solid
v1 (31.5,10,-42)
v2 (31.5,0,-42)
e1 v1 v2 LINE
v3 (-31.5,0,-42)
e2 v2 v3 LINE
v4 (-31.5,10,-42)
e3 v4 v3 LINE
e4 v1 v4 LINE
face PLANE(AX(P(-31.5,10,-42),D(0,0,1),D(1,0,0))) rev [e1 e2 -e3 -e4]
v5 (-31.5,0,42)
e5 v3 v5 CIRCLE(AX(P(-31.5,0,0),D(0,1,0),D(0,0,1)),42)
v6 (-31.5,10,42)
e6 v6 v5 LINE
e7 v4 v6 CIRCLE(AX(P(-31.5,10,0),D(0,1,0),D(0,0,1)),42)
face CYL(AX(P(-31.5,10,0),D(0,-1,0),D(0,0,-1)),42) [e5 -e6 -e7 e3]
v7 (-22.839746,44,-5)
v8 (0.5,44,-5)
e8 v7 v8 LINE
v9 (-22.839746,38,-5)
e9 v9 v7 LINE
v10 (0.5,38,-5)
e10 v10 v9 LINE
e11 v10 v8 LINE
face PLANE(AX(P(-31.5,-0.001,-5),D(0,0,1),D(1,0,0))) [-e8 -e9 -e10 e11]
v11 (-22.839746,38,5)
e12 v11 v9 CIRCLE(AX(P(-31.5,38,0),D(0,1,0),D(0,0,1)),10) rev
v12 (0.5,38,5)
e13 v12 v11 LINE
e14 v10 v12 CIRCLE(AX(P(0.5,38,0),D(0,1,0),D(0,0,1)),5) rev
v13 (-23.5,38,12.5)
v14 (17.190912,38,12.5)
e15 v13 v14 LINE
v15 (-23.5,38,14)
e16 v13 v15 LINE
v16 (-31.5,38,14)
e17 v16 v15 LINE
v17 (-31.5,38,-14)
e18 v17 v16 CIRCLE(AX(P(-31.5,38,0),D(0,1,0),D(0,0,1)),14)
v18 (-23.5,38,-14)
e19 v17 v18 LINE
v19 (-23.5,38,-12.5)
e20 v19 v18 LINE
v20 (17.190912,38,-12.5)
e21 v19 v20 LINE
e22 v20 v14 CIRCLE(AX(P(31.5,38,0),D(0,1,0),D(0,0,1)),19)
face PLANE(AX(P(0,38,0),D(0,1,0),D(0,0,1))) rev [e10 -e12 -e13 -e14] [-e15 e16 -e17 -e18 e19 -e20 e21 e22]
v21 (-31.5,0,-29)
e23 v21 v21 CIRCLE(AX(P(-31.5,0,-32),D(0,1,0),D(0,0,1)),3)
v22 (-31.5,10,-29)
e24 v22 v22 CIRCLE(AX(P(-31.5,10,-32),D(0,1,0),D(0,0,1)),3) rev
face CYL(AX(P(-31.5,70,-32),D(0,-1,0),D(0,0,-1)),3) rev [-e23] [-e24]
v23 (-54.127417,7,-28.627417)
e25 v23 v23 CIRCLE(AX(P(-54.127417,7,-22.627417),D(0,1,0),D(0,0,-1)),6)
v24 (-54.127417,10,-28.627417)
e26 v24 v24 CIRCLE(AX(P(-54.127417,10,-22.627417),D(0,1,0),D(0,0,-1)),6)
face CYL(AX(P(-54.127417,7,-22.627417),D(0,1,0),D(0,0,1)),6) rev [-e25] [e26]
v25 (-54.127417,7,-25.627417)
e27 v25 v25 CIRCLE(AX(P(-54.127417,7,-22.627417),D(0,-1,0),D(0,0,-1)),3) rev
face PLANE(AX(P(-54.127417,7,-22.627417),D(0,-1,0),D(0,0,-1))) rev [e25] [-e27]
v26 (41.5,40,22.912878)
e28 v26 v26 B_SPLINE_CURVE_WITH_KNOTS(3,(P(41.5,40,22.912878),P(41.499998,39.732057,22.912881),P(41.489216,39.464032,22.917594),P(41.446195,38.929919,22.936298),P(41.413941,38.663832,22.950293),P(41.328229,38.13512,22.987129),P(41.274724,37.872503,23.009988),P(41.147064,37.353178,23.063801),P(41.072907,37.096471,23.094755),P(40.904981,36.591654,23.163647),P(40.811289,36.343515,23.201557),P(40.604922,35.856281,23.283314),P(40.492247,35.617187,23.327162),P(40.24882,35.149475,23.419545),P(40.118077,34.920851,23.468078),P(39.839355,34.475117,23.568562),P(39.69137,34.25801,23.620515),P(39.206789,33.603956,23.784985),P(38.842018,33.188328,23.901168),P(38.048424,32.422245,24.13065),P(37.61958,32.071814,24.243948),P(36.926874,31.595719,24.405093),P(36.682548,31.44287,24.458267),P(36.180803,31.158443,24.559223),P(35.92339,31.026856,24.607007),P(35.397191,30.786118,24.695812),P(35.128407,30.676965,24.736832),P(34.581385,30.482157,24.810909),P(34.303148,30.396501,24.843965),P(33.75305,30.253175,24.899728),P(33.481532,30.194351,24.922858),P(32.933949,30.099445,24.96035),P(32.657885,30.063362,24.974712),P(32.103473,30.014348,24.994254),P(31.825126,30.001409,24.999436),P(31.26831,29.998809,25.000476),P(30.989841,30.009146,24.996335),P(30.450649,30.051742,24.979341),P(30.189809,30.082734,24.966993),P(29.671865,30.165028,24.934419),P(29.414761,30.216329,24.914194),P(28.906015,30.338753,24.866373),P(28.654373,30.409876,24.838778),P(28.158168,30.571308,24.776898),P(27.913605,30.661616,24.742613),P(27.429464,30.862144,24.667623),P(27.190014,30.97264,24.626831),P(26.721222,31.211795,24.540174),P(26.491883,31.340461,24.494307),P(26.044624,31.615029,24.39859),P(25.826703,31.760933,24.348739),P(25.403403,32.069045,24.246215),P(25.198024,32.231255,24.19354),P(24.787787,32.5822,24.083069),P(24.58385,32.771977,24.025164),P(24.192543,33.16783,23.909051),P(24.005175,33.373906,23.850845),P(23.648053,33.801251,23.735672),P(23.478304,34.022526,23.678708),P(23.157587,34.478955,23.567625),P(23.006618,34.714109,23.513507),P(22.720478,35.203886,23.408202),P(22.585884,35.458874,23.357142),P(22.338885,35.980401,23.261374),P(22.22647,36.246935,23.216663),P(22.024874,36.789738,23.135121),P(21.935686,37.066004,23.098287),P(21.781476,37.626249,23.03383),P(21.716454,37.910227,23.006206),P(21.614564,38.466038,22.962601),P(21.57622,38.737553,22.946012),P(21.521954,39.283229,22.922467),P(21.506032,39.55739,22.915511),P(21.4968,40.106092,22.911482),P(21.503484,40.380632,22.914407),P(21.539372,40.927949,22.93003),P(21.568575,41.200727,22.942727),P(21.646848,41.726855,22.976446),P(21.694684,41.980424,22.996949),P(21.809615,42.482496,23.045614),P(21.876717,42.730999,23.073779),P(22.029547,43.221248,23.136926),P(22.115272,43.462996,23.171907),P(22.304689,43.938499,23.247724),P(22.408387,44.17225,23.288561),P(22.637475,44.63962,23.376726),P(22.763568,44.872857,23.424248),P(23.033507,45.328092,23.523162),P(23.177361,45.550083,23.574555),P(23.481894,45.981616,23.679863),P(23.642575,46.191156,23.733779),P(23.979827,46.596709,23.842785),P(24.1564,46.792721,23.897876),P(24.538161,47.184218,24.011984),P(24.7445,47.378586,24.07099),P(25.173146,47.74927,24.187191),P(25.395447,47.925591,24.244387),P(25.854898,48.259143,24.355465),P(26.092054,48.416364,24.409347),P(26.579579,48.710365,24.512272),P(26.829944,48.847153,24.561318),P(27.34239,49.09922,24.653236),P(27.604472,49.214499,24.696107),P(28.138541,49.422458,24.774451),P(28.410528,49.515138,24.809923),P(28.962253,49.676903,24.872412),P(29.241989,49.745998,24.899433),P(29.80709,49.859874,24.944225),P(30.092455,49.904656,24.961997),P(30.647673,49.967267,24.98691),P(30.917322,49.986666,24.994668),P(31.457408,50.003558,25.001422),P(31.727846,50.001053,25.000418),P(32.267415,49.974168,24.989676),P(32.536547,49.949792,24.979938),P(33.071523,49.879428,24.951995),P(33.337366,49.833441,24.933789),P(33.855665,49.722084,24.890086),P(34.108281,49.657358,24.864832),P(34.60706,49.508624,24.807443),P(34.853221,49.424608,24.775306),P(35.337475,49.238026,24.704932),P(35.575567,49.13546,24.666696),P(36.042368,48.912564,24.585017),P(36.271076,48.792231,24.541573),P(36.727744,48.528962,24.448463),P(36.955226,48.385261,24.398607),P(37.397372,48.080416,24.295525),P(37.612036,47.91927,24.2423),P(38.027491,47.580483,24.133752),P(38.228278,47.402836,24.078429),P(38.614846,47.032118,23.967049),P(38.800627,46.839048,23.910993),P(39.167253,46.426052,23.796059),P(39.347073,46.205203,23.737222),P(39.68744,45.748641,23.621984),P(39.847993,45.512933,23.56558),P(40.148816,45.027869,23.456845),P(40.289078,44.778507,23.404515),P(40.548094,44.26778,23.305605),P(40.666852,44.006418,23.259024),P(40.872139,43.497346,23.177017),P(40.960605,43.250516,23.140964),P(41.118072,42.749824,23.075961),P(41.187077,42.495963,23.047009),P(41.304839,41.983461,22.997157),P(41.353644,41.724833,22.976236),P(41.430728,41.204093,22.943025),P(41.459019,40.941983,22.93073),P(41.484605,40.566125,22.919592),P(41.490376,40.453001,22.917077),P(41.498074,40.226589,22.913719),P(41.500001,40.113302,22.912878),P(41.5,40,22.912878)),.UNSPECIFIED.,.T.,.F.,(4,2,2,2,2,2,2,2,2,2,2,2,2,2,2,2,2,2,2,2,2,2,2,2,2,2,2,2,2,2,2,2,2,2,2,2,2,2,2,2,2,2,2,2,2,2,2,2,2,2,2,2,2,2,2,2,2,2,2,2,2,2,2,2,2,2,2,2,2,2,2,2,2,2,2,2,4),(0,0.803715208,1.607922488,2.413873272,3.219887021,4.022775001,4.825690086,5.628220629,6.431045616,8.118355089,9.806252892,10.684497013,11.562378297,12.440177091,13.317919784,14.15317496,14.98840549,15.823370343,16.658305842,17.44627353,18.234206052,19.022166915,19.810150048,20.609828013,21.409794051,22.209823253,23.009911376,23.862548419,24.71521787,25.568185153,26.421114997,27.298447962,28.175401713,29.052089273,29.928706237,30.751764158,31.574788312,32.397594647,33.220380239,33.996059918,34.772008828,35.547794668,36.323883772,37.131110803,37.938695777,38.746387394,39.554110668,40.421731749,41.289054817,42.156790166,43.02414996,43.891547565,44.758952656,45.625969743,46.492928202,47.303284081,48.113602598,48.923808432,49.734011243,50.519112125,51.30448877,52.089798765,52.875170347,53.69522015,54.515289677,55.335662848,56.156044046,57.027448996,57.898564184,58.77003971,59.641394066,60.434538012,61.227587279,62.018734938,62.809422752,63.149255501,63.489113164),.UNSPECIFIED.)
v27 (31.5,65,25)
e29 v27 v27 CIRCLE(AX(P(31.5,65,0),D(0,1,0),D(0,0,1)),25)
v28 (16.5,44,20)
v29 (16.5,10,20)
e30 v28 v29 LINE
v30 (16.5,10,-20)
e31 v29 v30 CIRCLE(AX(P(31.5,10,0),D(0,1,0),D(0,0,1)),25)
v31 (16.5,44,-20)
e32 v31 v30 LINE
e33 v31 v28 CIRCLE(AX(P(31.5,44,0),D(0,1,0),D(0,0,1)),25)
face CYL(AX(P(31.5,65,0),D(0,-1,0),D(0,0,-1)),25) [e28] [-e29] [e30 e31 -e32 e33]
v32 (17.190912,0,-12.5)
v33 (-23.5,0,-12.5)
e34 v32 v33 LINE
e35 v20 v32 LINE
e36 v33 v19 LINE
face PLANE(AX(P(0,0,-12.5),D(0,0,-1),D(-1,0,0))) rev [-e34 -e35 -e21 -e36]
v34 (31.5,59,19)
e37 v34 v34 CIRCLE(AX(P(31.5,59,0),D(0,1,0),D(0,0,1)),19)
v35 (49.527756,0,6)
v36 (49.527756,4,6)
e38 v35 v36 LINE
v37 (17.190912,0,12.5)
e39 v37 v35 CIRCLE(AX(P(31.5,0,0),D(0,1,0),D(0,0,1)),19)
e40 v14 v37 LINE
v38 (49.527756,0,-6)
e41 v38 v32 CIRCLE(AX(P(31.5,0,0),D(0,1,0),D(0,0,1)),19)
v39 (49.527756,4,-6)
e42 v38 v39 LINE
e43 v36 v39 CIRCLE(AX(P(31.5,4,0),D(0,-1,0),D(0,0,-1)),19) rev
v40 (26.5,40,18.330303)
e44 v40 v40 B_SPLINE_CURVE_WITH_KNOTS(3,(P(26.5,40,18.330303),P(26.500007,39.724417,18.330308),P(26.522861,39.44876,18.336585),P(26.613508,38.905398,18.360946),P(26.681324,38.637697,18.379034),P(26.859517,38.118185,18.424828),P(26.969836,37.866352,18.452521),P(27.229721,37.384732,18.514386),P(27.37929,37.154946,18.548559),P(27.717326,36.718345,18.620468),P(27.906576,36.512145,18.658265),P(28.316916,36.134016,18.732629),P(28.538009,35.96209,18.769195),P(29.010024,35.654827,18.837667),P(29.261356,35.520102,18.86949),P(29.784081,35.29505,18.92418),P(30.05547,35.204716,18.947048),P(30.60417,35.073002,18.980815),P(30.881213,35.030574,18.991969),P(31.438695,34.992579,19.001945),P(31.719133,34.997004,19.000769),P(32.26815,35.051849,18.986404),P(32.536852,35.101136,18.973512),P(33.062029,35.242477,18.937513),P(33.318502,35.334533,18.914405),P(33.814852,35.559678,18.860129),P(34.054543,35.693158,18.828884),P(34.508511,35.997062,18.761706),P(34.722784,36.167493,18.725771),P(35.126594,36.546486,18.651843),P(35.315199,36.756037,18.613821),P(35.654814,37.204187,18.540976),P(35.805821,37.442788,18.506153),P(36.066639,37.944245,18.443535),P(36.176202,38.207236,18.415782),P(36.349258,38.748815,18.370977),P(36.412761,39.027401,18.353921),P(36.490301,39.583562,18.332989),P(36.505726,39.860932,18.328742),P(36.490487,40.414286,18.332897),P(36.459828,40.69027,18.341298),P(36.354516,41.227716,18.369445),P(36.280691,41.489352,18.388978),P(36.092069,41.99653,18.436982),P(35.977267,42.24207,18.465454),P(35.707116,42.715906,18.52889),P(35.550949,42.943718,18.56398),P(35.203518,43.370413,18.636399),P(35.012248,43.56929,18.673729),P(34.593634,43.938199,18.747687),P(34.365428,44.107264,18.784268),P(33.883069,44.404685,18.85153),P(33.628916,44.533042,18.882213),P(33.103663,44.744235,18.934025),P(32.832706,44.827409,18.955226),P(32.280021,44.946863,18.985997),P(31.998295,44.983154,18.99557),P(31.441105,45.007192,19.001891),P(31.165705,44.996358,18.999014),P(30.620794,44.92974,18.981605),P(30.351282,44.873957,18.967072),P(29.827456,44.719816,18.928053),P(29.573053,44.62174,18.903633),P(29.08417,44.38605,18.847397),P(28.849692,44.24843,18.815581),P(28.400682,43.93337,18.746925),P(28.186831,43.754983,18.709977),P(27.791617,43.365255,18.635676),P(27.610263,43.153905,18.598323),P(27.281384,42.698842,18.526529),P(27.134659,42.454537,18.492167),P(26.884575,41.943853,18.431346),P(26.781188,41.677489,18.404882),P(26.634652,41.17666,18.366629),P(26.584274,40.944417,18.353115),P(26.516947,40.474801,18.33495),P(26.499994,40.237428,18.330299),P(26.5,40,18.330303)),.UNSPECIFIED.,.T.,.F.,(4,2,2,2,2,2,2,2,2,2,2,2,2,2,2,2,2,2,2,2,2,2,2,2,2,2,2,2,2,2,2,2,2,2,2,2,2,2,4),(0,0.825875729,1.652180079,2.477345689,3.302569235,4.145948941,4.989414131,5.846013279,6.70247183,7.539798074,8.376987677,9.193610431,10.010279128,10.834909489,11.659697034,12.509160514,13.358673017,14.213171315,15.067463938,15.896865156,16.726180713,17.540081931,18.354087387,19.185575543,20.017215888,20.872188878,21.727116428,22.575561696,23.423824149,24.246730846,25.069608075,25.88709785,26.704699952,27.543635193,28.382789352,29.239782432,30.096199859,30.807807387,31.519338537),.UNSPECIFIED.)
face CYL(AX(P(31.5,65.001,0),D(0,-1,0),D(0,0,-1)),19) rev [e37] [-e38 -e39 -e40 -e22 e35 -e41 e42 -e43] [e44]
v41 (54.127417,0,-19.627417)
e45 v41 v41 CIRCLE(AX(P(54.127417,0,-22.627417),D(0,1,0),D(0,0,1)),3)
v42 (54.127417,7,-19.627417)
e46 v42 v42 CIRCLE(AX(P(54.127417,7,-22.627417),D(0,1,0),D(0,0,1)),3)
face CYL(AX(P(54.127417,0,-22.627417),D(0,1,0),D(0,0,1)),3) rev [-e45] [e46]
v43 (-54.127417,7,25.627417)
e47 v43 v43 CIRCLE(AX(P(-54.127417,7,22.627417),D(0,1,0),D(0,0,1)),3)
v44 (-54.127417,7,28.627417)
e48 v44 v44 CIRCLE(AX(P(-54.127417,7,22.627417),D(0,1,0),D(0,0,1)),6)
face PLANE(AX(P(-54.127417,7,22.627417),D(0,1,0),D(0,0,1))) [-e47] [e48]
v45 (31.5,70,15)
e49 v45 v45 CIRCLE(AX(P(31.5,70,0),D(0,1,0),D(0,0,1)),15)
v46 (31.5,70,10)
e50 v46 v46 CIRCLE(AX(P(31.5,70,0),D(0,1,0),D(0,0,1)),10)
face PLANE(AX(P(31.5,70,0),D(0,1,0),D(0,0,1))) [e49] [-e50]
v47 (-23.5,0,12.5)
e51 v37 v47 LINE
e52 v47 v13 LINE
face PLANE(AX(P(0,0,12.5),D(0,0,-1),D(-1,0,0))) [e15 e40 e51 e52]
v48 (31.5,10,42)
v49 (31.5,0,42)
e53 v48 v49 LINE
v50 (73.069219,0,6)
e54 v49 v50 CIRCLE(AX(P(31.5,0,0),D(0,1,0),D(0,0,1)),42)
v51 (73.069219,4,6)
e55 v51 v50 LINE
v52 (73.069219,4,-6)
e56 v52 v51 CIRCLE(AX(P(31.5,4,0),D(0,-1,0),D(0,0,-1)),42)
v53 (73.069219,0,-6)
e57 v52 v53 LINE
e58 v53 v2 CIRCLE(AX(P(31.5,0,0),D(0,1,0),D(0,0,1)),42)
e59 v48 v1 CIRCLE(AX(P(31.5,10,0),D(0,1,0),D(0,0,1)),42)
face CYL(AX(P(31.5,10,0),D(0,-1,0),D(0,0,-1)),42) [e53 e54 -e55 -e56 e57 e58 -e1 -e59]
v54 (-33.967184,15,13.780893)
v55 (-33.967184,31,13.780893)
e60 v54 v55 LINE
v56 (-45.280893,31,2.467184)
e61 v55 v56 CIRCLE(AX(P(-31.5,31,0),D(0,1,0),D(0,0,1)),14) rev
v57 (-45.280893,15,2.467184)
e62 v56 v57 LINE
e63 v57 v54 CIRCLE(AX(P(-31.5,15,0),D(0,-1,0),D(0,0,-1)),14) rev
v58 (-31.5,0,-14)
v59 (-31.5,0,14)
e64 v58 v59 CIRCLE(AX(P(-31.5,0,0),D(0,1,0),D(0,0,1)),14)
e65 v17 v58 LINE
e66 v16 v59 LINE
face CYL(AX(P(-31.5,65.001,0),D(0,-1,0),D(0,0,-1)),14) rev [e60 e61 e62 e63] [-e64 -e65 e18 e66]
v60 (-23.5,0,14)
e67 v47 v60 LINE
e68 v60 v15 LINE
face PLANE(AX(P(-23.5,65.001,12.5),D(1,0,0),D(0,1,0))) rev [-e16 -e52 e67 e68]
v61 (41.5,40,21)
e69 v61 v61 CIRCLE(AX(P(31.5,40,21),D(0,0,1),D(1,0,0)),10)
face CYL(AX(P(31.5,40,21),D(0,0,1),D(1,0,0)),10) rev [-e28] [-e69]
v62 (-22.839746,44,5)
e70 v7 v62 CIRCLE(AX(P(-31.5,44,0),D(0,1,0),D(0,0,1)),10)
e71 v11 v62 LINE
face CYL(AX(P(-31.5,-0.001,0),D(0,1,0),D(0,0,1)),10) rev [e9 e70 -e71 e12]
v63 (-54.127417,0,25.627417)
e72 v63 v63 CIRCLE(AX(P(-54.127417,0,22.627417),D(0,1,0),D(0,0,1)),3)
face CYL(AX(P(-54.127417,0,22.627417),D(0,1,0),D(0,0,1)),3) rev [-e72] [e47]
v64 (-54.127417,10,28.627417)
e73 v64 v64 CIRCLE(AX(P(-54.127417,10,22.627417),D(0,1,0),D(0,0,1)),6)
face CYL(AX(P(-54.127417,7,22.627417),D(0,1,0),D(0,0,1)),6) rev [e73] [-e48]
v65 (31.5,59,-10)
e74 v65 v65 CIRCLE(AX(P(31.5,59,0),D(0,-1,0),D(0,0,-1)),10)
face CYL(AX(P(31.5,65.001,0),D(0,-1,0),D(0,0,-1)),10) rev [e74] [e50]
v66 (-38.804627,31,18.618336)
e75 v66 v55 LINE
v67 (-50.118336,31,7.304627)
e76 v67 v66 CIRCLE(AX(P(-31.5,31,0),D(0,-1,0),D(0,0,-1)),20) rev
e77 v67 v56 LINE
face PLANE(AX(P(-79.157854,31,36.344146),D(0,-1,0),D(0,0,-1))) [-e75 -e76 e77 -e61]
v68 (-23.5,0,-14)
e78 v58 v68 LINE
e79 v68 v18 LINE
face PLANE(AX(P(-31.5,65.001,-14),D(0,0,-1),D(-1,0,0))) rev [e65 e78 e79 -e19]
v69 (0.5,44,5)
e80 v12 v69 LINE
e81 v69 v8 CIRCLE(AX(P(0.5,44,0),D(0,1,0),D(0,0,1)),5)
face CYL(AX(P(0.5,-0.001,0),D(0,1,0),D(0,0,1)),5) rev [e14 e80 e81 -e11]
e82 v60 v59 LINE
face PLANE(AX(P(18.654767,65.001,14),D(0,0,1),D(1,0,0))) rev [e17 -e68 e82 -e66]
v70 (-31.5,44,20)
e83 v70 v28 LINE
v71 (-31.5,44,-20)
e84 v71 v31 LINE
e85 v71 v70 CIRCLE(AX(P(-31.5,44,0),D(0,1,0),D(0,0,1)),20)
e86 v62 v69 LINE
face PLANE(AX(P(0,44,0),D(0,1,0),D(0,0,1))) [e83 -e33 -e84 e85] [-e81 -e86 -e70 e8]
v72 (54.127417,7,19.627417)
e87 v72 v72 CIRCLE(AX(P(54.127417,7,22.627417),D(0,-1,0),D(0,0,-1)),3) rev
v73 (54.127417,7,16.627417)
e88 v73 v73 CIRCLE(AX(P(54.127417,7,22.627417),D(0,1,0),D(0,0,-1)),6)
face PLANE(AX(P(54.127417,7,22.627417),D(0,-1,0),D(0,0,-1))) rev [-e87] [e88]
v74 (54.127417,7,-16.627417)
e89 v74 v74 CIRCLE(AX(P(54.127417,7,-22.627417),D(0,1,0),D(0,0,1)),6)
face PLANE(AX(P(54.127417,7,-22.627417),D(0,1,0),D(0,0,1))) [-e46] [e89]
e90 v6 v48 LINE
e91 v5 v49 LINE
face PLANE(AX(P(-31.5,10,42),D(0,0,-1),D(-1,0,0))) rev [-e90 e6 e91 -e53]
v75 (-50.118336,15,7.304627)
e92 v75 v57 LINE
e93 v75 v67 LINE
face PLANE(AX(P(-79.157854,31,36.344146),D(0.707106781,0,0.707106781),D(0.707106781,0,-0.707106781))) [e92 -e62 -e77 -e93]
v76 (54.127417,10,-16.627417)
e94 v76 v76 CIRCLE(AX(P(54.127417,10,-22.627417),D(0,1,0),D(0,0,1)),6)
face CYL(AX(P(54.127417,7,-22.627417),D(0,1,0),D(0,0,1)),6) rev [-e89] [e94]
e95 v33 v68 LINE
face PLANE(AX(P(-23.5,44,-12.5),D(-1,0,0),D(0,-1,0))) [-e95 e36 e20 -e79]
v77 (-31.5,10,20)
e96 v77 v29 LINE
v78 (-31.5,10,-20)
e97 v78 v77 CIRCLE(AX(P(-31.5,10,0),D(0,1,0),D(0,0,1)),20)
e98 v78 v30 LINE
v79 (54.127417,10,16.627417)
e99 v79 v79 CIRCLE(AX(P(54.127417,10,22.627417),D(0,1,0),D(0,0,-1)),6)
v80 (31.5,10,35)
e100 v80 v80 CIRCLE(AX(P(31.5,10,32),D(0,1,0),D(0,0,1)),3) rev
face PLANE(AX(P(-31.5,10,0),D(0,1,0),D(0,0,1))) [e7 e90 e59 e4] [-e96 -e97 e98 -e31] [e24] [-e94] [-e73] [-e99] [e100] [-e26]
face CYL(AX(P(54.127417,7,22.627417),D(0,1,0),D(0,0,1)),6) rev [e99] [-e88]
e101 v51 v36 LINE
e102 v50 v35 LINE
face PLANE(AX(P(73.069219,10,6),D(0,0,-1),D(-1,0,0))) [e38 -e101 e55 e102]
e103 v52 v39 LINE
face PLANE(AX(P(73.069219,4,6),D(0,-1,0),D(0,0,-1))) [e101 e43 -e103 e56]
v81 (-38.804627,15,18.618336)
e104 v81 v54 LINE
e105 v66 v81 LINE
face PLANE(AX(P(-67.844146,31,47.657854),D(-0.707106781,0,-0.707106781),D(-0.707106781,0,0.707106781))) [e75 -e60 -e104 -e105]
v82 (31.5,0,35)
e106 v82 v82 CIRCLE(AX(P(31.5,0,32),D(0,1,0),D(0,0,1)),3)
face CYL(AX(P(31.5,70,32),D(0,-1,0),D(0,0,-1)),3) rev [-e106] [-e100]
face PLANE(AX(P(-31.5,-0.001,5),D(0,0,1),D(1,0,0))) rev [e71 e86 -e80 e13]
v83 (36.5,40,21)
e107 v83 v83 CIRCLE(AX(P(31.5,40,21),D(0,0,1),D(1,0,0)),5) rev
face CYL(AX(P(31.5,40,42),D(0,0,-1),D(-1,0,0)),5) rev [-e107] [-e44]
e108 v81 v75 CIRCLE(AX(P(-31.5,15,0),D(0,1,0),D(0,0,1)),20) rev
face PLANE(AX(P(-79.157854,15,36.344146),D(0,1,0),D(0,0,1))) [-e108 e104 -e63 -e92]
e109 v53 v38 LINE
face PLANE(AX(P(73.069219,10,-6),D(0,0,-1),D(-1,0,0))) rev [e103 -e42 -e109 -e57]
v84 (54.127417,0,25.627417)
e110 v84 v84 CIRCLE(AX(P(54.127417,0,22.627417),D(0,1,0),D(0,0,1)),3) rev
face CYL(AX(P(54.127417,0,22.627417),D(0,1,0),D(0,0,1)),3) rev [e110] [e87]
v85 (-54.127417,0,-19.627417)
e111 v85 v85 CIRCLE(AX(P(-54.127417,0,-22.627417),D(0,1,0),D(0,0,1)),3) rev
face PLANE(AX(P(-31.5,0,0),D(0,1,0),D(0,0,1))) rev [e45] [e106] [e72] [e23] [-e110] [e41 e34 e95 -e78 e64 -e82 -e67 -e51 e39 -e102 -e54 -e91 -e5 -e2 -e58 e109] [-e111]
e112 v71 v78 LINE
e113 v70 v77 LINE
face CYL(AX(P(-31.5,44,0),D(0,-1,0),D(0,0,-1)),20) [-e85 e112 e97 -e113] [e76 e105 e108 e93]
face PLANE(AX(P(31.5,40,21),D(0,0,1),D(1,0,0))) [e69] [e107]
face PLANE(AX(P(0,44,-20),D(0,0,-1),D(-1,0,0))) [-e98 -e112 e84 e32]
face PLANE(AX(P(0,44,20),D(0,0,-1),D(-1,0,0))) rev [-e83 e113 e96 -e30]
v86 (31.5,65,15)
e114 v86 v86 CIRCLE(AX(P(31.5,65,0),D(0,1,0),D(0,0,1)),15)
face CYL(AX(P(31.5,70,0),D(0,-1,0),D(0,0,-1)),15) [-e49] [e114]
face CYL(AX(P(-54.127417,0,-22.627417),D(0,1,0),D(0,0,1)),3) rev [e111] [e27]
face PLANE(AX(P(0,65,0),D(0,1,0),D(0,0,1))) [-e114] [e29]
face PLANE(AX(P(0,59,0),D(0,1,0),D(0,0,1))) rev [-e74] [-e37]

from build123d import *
from build123d.topology import SkipClean

# Parameters (mm, degrees)
EXTRUDE_1_DEPTH                       = 10
SKETCH_2_R                            = 6
SKETCH_2_R_2                          = 3
CUT_EXTRUDE_1_DEPTH                   = 3
SKETCH_2_2_R                          = 3
CUT_EXTRUDE_2_DEPTH                   = 86.242301705
EXTRUDE_2_DEPTH                       = 34
SKETCH_3_3_R                          = 25
EXTRUDE_3_DEPTH                       = 55
SHELL_START                           = 10
SHELL_9_DEPTH                         = 28
SHELL_START_2                         = 38
SHELL_9_2_OUTLINE_R                   = 19
SHELL_9_2_DEPTH                       = 21
SKETCH_5_R                            = 19
CUT_EXTRUDE_5_DEPTH                   = 10
SKETCH_6_R                            = 10
CUT_EXTRUDE_6_DEPTH                   = 6
SKETCH_7_R                            = 15
SKETCH_7_R_2                          = 10
EXTRUDE_4_DEPTH                       = 5
CUT_EXTRUDE_START                     = 25
SKETCH_8_R                            = 10
SKETCH_8_R_2                          = 5
CUT_EXTRUDE_7_DEPTH                   = 4
SKETCH_8_2_R                          = 5
CUT_EXTRUDE_8_DEPTH                   = 110.846483785
SKETCH_9_R                            = 10
CUT_EXTRUDE_9_DEPTH                   = 6
EXTRUDE_START                         = -14
SKETCH_10_W                           = 42.154767421
SKETCH_10_H                           = 38
EXTRUDE_5_DEPTH                       = 1.5
EXTRUDE_START_2                       = 14
SKETCH_10_2_W                         = 42.154767421
SKETCH_10_2_H                         = 38
EXTRUDE_6_DEPTH                       = 1.5
SKETCH_11_R                           = 19
CUT_EXTRUDE_10_DEPTH                  = 104.185512549
CUT_EXTRUDE_START_2                   = 49.527756
SKETCH_12_W                           = 12
SKETCH_12_H                           = 4
CUT_EXTRUDE_11_DEPTH                  = 23.972244
SKETCH_13_R                           = 3
CUT_EXTRUDE_13_DEPTH                  = 110.846483785
CUT_EXTRUDE_14_REACH                  = 141.071
CUT_EXTRUDE_14_END_RADIUS             = 14
SKETCH_15_W                           = 16
SKETCH_15_H                           = 16
CUT_EXTRUDE_14_DIRECTION_2_REACH      = 141.071
CUT_EXTRUDE_14_DIRECTION_2_END_RADIUS = 20


# Read off the part's stored shape, not the designer's step: 抽壳9
with BuildPart() as part:
    # 草图1 → 凸台-拉伸1 (new body)
    with BuildSketch(Plane(origin=(0, 0, 0), x_dir=(1, 0, 0), z_dir=(0, 1, 0))):
        with BuildLine():
            Line((-31.5, 42), (31.5, 42))
            ThreePointArc((31.5, 42), (73.5, 0), (31.5, -42))
            Line((31.5, -42), (-31.5, -42))
            ThreePointArc((-31.5, -42), (-73.5, 0), (-31.5, 42))
        make_face()
    extrude(amount=EXTRUDE_1_DEPTH)

    # 草图2 → 切除-拉伸1 (cut)
    # profile 1 of 4: a face of its own
    with BuildSketch(Plane(origin=(0, 10, 0), x_dir=(1, 0, 0), z_dir=(0, 1, 0))):
        with Locations(Location((54.127416998, 22.627416998, 0), (0, 0, 270))):
            Circle(SKETCH_2_R)
        with Locations(Location((54.127416998, 22.627416998, 0), (0, 0, 270))):
            Circle(SKETCH_2_R_2, mode=Mode.SUBTRACT)
    # profile 2 of 4: a face of its own
    with BuildSketch(Plane(origin=(0, 10, 0), x_dir=(1, 0, 0), z_dir=(0, 1, 0))):
        with Locations(Location((54.127416998, -22.627416998, 0), (0, 0, 90))):
            Circle(SKETCH_2_R)
        with Locations(Location((54.127416998, -22.627416998, 0), (0, 0, 90))):
            Circle(SKETCH_2_R_2, mode=Mode.SUBTRACT)
    # profile 3 of 4: a face of its own
    with BuildSketch(Plane(origin=(0, 10, 0), x_dir=(1, 0, 0), z_dir=(0, 1, 0))):
        with Locations(Location((-54.127416998, -22.627416998, 0), (0, 0, 270))):
            Circle(SKETCH_2_R)
        with Locations(Location((-54.127416998, -22.627416998, 0), (0, 0, 270))):
            Circle(SKETCH_2_R_2, mode=Mode.SUBTRACT)
    # profile 4 of 4: a face of its own
    with BuildSketch(Plane(origin=(0, 10, 0), x_dir=(1, 0, 0), z_dir=(0, 1, 0))):
        with Locations(Location((-54.127416998, 22.627416998, 0), (0, 0, 90))):
            Circle(SKETCH_2_R)
        with Locations(Location((-54.127416998, 22.627416998, 0), (0, 0, 90))):
            Circle(SKETCH_2_R_2, mode=Mode.SUBTRACT)
    extrude(amount=-CUT_EXTRUDE_1_DEPTH, mode=Mode.SUBTRACT)

    # 草图2<2> → 切除-拉伸2 (cut, through all)
    with BuildSketch(Plane(origin=(0, 10, 0), x_dir=(1, 0, 0), z_dir=(0, 1, 0))):
        with Locations(Location((-54.127416998, -22.627416998, 0), (0, 0, 270))):
            Circle(SKETCH_2_2_R)
        with Locations(Location((-54.127416998, 22.627416998, 0), (0, 0, 270))):
            Circle(SKETCH_2_2_R)
        with Locations(Location((54.127416998, 22.627416998, 0), (0, 0, 270))):
            Circle(SKETCH_2_2_R)
        with Locations(Location((54.127416998, -22.627416998, 0), (0, 0, 270))):
            Circle(SKETCH_2_2_R)
    extrude(amount=-CUT_EXTRUDE_2_DEPTH, mode=Mode.SUBTRACT)

    # 草图5 → 切除-拉伸5 (cut)
    with BuildSketch(Plane(origin=(0, 0, 0), x_dir=(1, 0, 0), z_dir=(0, 1, 0))):
        with Locations(Location((31.5, 0, 0), (0, 0, 132.536898363))):
            Circle(SKETCH_5_R)
        with BuildLine():
            Line((18.654767421, -14), (-31.5, -14))
            ThreePointArc((-31.5, -14), (-45.5, 0), (-31.5, 14))
            Line((-31.5, 14), (18.654767421, 14))
            ThreePointArc((18.654767421, 14), (12.5, 0), (18.654767421, -14))
        make_face()
    extrude(amount=CUT_EXTRUDE_5_DEPTH, mode=Mode.SUBTRACT)



with BuildPart() as body_2:
    # 草图3 → 凸台-拉伸2 (new body)
    with BuildSketch(Plane(origin=(0, 10, 0), x_dir=(1, 0, 0), z_dir=(0, 1, 0))):
        with BuildLine():
            Line((16.5, 20), (-31.5, 20))
            ThreePointArc((-31.5, 20), (-51.5, 0), (-31.5, -20))
            Line((-31.5, -20), (16.5, -20))
            ThreePointArc((16.5, -20), (6.5, 0), (16.5, 20))
        make_face()
    extrude(amount=EXTRUDE_2_DEPTH)


with BuildPart() as body_3:
    # 草图3<3> → 凸台-拉伸3 (new body)
    with BuildSketch(Plane(origin=(0, 10, 0), x_dir=(1, 0, 0), z_dir=(0, 1, 0))):
        with Locations(Location((31.5, 0, 0), (0, 0, 270))):
            Circle(SKETCH_3_3_R)
    extrude(amount=EXTRUDE_3_DEPTH)


with BuildPart() as body_2_1:
    add(body_2.part)

    # Combine 1: union body 3
    add(body_3.part)

    # 抽壳9 outline → 抽壳9 (cut)
    with BuildSketch(Plane(origin=(0, 0, 0), x_dir=(1, 0, 0), z_dir=(0, 1, 0)).offset(SHELL_START)):
        with BuildLine():
            Line((-31.5, -14), (18.654767421, -14))
            ThreePointArc((18.654767421, -14), (50.5, 0), (18.654767421, 14))
            Line((18.654767421, 14), (-31.5, 14))
            ThreePointArc((-31.5, 14), (-45.5, 0), (-31.5, -14))
        make_face()
    extrude(amount=SHELL_9_DEPTH, mode=Mode.SUBTRACT)

    # Shell 9 2 outline → Shell 9 2 (cut)
    with BuildSketch(Plane(origin=(0, 0, 0), x_dir=(1, 0, 0), z_dir=(0, 1, 0)).offset(SHELL_START_2)):
        with Locations((31.5, 0)):
            Circle(SHELL_9_2_OUTLINE_R)
    extrude(amount=SHELL_9_2_DEPTH, mode=Mode.SUBTRACT)

    # 草图6 → 切除-拉伸6 (cut)
    with BuildSketch(Plane.XZ.offset(-59)):
        with Locations(Location((31.5, 0, 0), (0, 0, 270))):
            Circle(SKETCH_6_R)
    extrude(amount=-CUT_EXTRUDE_6_DEPTH, mode=Mode.SUBTRACT)

    # 草图7 → 凸台-拉伸4 (add)
    with BuildSketch(Plane(origin=(0, 65, 0), x_dir=(1, 0, 0), z_dir=(0, 1, 0))):
        with Locations(Location((31.5, 0, 0), (0, 0, 270))):
            Circle(SKETCH_7_R)
        with Locations(Location((31.5, 0, 0), (0, 0, 90))):
            Circle(SKETCH_7_R_2, mode=Mode.SUBTRACT)
    extrude(amount=EXTRUDE_4_DEPTH)

    # 草图8 → 切除-拉伸7 (cut)
    with BuildSketch(Plane.XY.offset(CUT_EXTRUDE_START)):
        with Locations((31.5, 40)):
            Circle(SKETCH_8_R)
        with Locations((31.5, 40)):
            Circle(SKETCH_8_R_2, mode=Mode.SUBTRACT)
    extrude(amount=-CUT_EXTRUDE_7_DEPTH, mode=Mode.SUBTRACT)

    # 草图8<2> → 切除-拉伸8 (cut, through all)
    with BuildSketch(Plane.XY):
        with Locations(Location((31.5, 40, 0), (0, 0, 180))):
            Circle(SKETCH_8_2_R)
    extrude(amount=CUT_EXTRUDE_8_DEPTH, mode=Mode.SUBTRACT)

    # 草图9 → 切除-拉伸9 (cut)
    with BuildSketch(Plane(origin=(0, 44, 0), x_dir=(1, 0, 0), z_dir=(0, 1, 0))):
        with Locations((-31.5, 0)):
            Circle(SKETCH_9_R)
        with BuildLine():
            Line((-31.5, 5), (0.5, 5))
            ThreePointArc((0.5, 5), (5.5, 0), (0.5, -5))
            Line((0.5, -5), (-31.5, -5))
            ThreePointArc((-31.5, -5), (-36.5, 0), (-31.5, 5))
        make_face()
    extrude(amount=-CUT_EXTRUDE_9_DEPTH, mode=Mode.SUBTRACT)


with BuildPart() as part_1:
    add(part.part)

    add(body_2_1.part)  # 凸台-拉伸5 merges body 2
    # 草图10 → 凸台-拉伸5 (add)
    with BuildSketch(Plane.XY.offset(EXTRUDE_START)):
        with Locations((-2.422616289, 19)):
            Rectangle(SKETCH_10_W, SKETCH_10_H)
    extrude(amount=EXTRUDE_5_DEPTH)

    # 草图10<2> → 凸台-拉伸6 (add)
    with BuildSketch(Plane.XY.offset(EXTRUDE_START_2)):
        with Locations((-2.422616289, 19)):
            Rectangle(SKETCH_10_2_W, SKETCH_10_2_H)
    extrude(amount=-EXTRUDE_6_DEPTH)

    # 草图11 → 切除-拉伸10 (cut, through all)
    with SkipClean():  # the faces are left unmerged after this step: merging them gives an invalid solid
        with BuildSketch(Plane.XZ.offset(-59)):
            with Locations(Location((31.5, 0, 0), (0, 0, 221.139510415))):
                Circle(SKETCH_11_R)
        extrude(amount=CUT_EXTRUDE_10_DEPTH, mode=Mode.SUBTRACT)

    # 草图12 → 切除-拉伸11 (cut)
    with SkipClean():  # the faces are left unmerged after this step: merging them gives an invalid solid
        with BuildSketch(Plane(origin=(0, 0, 0), x_dir=(0, 0, -1), z_dir=(1, 0, 0)).offset(CUT_EXTRUDE_START_2)):
            with Locations((0, 2)):
                Rectangle(SKETCH_12_W, SKETCH_12_H)
        extrude(amount=CUT_EXTRUDE_11_DEPTH, mode=Mode.SUBTRACT)

    # 草图13 → 切除-拉伸13 (cut, through all)
    with SkipClean():  # the faces are left unmerged after this step: merging them gives an invalid solid
        with BuildSketch(Plane(origin=(0, 0, 0), x_dir=(1, 0, 0), z_dir=(0, 1, 0))):
            with Locations(Location((-31.5, 32, 0), (0, 0, 270))):
                Circle(SKETCH_13_R)
            with Locations(Location((31.5, -32, 0), (0, 0, 270))):
                Circle(SKETCH_13_R)
        extrude(amount=CUT_EXTRUDE_13_DEPTH, mode=Mode.SUBTRACT)

    # 切除-拉伸14: up to this cylinder (the profile starts outside it)
    with SkipClean():  # the faces are left unmerged after this step: merging them gives an invalid solid
        cut_extrude_14_end = Plane(origin=(-31.5, 23, 0), z_dir=(0, -1, 0)) * Cylinder(CUT_EXTRUDE_14_END_RADIUS, 311.142, mode=Mode.PRIVATE)
        # 草图15 → 切除-拉伸14 (cut, up to the surface)
        with BuildSketch(Plane(origin=(-25.75, 0, 25.75), x_dir=(0, -1, 0), z_dir=(-0.7071067811865488, 0, 0.7071067811865464)), mode=Mode.PRIVATE) as cut_extrude_14_sk1:
            with Locations((-23, -22.273863607)):
                Rectangle(SKETCH_15_W, SKETCH_15_H)
        cut_extrude_14_tool1 = extrude(cut_extrude_14_sk1.sketch, amount=-CUT_EXTRUDE_14_REACH, mode=Mode.PRIVATE) - cut_extrude_14_end
        add(cut_extrude_14_tool1.solids().sort_by_distance((-41.5, 23, 10))[0], mode=Mode.SUBTRACT)

    # 切除-拉伸14 direction 2: up to this cylinder (the profile starts inside it)
    with SkipClean():  # the faces are left unmerged after this step: merging them gives an invalid solid
        cut_extrude_14_direction_2_end = Plane(origin=(-31.5, 23, 0), z_dir=(0, -1, 0)) * Cylinder(CUT_EXTRUDE_14_DIRECTION_2_END_RADIUS, 323.142, mode=Mode.PRIVATE)
        # 草图15 → 切除-拉伸14 direction 2 (cut, up to the surface)
        with BuildSketch(Plane(origin=(-25.75, 0, 25.75), x_dir=(0, -1, 0), z_dir=(-0.7071067811865488, 0, 0.7071067811865464)), mode=Mode.PRIVATE) as cut_extrude_14_direction_2_sk1:
            with Locations((-23, -22.273863607)):
                Rectangle(SKETCH_15_W, SKETCH_15_H)
        cut_extrude_14_direction_2_tool1 = extrude(cut_extrude_14_direction_2_sk1.sketch, amount=CUT_EXTRUDE_14_DIRECTION_2_REACH, mode=Mode.PRIVATE) & cut_extrude_14_direction_2_end
        add(cut_extrude_14_direction_2_tool1.solids().sort_by_distance((-41.5, 23, 10))[0], mode=Mode.SUBTRACT)


solid = part_1.part
